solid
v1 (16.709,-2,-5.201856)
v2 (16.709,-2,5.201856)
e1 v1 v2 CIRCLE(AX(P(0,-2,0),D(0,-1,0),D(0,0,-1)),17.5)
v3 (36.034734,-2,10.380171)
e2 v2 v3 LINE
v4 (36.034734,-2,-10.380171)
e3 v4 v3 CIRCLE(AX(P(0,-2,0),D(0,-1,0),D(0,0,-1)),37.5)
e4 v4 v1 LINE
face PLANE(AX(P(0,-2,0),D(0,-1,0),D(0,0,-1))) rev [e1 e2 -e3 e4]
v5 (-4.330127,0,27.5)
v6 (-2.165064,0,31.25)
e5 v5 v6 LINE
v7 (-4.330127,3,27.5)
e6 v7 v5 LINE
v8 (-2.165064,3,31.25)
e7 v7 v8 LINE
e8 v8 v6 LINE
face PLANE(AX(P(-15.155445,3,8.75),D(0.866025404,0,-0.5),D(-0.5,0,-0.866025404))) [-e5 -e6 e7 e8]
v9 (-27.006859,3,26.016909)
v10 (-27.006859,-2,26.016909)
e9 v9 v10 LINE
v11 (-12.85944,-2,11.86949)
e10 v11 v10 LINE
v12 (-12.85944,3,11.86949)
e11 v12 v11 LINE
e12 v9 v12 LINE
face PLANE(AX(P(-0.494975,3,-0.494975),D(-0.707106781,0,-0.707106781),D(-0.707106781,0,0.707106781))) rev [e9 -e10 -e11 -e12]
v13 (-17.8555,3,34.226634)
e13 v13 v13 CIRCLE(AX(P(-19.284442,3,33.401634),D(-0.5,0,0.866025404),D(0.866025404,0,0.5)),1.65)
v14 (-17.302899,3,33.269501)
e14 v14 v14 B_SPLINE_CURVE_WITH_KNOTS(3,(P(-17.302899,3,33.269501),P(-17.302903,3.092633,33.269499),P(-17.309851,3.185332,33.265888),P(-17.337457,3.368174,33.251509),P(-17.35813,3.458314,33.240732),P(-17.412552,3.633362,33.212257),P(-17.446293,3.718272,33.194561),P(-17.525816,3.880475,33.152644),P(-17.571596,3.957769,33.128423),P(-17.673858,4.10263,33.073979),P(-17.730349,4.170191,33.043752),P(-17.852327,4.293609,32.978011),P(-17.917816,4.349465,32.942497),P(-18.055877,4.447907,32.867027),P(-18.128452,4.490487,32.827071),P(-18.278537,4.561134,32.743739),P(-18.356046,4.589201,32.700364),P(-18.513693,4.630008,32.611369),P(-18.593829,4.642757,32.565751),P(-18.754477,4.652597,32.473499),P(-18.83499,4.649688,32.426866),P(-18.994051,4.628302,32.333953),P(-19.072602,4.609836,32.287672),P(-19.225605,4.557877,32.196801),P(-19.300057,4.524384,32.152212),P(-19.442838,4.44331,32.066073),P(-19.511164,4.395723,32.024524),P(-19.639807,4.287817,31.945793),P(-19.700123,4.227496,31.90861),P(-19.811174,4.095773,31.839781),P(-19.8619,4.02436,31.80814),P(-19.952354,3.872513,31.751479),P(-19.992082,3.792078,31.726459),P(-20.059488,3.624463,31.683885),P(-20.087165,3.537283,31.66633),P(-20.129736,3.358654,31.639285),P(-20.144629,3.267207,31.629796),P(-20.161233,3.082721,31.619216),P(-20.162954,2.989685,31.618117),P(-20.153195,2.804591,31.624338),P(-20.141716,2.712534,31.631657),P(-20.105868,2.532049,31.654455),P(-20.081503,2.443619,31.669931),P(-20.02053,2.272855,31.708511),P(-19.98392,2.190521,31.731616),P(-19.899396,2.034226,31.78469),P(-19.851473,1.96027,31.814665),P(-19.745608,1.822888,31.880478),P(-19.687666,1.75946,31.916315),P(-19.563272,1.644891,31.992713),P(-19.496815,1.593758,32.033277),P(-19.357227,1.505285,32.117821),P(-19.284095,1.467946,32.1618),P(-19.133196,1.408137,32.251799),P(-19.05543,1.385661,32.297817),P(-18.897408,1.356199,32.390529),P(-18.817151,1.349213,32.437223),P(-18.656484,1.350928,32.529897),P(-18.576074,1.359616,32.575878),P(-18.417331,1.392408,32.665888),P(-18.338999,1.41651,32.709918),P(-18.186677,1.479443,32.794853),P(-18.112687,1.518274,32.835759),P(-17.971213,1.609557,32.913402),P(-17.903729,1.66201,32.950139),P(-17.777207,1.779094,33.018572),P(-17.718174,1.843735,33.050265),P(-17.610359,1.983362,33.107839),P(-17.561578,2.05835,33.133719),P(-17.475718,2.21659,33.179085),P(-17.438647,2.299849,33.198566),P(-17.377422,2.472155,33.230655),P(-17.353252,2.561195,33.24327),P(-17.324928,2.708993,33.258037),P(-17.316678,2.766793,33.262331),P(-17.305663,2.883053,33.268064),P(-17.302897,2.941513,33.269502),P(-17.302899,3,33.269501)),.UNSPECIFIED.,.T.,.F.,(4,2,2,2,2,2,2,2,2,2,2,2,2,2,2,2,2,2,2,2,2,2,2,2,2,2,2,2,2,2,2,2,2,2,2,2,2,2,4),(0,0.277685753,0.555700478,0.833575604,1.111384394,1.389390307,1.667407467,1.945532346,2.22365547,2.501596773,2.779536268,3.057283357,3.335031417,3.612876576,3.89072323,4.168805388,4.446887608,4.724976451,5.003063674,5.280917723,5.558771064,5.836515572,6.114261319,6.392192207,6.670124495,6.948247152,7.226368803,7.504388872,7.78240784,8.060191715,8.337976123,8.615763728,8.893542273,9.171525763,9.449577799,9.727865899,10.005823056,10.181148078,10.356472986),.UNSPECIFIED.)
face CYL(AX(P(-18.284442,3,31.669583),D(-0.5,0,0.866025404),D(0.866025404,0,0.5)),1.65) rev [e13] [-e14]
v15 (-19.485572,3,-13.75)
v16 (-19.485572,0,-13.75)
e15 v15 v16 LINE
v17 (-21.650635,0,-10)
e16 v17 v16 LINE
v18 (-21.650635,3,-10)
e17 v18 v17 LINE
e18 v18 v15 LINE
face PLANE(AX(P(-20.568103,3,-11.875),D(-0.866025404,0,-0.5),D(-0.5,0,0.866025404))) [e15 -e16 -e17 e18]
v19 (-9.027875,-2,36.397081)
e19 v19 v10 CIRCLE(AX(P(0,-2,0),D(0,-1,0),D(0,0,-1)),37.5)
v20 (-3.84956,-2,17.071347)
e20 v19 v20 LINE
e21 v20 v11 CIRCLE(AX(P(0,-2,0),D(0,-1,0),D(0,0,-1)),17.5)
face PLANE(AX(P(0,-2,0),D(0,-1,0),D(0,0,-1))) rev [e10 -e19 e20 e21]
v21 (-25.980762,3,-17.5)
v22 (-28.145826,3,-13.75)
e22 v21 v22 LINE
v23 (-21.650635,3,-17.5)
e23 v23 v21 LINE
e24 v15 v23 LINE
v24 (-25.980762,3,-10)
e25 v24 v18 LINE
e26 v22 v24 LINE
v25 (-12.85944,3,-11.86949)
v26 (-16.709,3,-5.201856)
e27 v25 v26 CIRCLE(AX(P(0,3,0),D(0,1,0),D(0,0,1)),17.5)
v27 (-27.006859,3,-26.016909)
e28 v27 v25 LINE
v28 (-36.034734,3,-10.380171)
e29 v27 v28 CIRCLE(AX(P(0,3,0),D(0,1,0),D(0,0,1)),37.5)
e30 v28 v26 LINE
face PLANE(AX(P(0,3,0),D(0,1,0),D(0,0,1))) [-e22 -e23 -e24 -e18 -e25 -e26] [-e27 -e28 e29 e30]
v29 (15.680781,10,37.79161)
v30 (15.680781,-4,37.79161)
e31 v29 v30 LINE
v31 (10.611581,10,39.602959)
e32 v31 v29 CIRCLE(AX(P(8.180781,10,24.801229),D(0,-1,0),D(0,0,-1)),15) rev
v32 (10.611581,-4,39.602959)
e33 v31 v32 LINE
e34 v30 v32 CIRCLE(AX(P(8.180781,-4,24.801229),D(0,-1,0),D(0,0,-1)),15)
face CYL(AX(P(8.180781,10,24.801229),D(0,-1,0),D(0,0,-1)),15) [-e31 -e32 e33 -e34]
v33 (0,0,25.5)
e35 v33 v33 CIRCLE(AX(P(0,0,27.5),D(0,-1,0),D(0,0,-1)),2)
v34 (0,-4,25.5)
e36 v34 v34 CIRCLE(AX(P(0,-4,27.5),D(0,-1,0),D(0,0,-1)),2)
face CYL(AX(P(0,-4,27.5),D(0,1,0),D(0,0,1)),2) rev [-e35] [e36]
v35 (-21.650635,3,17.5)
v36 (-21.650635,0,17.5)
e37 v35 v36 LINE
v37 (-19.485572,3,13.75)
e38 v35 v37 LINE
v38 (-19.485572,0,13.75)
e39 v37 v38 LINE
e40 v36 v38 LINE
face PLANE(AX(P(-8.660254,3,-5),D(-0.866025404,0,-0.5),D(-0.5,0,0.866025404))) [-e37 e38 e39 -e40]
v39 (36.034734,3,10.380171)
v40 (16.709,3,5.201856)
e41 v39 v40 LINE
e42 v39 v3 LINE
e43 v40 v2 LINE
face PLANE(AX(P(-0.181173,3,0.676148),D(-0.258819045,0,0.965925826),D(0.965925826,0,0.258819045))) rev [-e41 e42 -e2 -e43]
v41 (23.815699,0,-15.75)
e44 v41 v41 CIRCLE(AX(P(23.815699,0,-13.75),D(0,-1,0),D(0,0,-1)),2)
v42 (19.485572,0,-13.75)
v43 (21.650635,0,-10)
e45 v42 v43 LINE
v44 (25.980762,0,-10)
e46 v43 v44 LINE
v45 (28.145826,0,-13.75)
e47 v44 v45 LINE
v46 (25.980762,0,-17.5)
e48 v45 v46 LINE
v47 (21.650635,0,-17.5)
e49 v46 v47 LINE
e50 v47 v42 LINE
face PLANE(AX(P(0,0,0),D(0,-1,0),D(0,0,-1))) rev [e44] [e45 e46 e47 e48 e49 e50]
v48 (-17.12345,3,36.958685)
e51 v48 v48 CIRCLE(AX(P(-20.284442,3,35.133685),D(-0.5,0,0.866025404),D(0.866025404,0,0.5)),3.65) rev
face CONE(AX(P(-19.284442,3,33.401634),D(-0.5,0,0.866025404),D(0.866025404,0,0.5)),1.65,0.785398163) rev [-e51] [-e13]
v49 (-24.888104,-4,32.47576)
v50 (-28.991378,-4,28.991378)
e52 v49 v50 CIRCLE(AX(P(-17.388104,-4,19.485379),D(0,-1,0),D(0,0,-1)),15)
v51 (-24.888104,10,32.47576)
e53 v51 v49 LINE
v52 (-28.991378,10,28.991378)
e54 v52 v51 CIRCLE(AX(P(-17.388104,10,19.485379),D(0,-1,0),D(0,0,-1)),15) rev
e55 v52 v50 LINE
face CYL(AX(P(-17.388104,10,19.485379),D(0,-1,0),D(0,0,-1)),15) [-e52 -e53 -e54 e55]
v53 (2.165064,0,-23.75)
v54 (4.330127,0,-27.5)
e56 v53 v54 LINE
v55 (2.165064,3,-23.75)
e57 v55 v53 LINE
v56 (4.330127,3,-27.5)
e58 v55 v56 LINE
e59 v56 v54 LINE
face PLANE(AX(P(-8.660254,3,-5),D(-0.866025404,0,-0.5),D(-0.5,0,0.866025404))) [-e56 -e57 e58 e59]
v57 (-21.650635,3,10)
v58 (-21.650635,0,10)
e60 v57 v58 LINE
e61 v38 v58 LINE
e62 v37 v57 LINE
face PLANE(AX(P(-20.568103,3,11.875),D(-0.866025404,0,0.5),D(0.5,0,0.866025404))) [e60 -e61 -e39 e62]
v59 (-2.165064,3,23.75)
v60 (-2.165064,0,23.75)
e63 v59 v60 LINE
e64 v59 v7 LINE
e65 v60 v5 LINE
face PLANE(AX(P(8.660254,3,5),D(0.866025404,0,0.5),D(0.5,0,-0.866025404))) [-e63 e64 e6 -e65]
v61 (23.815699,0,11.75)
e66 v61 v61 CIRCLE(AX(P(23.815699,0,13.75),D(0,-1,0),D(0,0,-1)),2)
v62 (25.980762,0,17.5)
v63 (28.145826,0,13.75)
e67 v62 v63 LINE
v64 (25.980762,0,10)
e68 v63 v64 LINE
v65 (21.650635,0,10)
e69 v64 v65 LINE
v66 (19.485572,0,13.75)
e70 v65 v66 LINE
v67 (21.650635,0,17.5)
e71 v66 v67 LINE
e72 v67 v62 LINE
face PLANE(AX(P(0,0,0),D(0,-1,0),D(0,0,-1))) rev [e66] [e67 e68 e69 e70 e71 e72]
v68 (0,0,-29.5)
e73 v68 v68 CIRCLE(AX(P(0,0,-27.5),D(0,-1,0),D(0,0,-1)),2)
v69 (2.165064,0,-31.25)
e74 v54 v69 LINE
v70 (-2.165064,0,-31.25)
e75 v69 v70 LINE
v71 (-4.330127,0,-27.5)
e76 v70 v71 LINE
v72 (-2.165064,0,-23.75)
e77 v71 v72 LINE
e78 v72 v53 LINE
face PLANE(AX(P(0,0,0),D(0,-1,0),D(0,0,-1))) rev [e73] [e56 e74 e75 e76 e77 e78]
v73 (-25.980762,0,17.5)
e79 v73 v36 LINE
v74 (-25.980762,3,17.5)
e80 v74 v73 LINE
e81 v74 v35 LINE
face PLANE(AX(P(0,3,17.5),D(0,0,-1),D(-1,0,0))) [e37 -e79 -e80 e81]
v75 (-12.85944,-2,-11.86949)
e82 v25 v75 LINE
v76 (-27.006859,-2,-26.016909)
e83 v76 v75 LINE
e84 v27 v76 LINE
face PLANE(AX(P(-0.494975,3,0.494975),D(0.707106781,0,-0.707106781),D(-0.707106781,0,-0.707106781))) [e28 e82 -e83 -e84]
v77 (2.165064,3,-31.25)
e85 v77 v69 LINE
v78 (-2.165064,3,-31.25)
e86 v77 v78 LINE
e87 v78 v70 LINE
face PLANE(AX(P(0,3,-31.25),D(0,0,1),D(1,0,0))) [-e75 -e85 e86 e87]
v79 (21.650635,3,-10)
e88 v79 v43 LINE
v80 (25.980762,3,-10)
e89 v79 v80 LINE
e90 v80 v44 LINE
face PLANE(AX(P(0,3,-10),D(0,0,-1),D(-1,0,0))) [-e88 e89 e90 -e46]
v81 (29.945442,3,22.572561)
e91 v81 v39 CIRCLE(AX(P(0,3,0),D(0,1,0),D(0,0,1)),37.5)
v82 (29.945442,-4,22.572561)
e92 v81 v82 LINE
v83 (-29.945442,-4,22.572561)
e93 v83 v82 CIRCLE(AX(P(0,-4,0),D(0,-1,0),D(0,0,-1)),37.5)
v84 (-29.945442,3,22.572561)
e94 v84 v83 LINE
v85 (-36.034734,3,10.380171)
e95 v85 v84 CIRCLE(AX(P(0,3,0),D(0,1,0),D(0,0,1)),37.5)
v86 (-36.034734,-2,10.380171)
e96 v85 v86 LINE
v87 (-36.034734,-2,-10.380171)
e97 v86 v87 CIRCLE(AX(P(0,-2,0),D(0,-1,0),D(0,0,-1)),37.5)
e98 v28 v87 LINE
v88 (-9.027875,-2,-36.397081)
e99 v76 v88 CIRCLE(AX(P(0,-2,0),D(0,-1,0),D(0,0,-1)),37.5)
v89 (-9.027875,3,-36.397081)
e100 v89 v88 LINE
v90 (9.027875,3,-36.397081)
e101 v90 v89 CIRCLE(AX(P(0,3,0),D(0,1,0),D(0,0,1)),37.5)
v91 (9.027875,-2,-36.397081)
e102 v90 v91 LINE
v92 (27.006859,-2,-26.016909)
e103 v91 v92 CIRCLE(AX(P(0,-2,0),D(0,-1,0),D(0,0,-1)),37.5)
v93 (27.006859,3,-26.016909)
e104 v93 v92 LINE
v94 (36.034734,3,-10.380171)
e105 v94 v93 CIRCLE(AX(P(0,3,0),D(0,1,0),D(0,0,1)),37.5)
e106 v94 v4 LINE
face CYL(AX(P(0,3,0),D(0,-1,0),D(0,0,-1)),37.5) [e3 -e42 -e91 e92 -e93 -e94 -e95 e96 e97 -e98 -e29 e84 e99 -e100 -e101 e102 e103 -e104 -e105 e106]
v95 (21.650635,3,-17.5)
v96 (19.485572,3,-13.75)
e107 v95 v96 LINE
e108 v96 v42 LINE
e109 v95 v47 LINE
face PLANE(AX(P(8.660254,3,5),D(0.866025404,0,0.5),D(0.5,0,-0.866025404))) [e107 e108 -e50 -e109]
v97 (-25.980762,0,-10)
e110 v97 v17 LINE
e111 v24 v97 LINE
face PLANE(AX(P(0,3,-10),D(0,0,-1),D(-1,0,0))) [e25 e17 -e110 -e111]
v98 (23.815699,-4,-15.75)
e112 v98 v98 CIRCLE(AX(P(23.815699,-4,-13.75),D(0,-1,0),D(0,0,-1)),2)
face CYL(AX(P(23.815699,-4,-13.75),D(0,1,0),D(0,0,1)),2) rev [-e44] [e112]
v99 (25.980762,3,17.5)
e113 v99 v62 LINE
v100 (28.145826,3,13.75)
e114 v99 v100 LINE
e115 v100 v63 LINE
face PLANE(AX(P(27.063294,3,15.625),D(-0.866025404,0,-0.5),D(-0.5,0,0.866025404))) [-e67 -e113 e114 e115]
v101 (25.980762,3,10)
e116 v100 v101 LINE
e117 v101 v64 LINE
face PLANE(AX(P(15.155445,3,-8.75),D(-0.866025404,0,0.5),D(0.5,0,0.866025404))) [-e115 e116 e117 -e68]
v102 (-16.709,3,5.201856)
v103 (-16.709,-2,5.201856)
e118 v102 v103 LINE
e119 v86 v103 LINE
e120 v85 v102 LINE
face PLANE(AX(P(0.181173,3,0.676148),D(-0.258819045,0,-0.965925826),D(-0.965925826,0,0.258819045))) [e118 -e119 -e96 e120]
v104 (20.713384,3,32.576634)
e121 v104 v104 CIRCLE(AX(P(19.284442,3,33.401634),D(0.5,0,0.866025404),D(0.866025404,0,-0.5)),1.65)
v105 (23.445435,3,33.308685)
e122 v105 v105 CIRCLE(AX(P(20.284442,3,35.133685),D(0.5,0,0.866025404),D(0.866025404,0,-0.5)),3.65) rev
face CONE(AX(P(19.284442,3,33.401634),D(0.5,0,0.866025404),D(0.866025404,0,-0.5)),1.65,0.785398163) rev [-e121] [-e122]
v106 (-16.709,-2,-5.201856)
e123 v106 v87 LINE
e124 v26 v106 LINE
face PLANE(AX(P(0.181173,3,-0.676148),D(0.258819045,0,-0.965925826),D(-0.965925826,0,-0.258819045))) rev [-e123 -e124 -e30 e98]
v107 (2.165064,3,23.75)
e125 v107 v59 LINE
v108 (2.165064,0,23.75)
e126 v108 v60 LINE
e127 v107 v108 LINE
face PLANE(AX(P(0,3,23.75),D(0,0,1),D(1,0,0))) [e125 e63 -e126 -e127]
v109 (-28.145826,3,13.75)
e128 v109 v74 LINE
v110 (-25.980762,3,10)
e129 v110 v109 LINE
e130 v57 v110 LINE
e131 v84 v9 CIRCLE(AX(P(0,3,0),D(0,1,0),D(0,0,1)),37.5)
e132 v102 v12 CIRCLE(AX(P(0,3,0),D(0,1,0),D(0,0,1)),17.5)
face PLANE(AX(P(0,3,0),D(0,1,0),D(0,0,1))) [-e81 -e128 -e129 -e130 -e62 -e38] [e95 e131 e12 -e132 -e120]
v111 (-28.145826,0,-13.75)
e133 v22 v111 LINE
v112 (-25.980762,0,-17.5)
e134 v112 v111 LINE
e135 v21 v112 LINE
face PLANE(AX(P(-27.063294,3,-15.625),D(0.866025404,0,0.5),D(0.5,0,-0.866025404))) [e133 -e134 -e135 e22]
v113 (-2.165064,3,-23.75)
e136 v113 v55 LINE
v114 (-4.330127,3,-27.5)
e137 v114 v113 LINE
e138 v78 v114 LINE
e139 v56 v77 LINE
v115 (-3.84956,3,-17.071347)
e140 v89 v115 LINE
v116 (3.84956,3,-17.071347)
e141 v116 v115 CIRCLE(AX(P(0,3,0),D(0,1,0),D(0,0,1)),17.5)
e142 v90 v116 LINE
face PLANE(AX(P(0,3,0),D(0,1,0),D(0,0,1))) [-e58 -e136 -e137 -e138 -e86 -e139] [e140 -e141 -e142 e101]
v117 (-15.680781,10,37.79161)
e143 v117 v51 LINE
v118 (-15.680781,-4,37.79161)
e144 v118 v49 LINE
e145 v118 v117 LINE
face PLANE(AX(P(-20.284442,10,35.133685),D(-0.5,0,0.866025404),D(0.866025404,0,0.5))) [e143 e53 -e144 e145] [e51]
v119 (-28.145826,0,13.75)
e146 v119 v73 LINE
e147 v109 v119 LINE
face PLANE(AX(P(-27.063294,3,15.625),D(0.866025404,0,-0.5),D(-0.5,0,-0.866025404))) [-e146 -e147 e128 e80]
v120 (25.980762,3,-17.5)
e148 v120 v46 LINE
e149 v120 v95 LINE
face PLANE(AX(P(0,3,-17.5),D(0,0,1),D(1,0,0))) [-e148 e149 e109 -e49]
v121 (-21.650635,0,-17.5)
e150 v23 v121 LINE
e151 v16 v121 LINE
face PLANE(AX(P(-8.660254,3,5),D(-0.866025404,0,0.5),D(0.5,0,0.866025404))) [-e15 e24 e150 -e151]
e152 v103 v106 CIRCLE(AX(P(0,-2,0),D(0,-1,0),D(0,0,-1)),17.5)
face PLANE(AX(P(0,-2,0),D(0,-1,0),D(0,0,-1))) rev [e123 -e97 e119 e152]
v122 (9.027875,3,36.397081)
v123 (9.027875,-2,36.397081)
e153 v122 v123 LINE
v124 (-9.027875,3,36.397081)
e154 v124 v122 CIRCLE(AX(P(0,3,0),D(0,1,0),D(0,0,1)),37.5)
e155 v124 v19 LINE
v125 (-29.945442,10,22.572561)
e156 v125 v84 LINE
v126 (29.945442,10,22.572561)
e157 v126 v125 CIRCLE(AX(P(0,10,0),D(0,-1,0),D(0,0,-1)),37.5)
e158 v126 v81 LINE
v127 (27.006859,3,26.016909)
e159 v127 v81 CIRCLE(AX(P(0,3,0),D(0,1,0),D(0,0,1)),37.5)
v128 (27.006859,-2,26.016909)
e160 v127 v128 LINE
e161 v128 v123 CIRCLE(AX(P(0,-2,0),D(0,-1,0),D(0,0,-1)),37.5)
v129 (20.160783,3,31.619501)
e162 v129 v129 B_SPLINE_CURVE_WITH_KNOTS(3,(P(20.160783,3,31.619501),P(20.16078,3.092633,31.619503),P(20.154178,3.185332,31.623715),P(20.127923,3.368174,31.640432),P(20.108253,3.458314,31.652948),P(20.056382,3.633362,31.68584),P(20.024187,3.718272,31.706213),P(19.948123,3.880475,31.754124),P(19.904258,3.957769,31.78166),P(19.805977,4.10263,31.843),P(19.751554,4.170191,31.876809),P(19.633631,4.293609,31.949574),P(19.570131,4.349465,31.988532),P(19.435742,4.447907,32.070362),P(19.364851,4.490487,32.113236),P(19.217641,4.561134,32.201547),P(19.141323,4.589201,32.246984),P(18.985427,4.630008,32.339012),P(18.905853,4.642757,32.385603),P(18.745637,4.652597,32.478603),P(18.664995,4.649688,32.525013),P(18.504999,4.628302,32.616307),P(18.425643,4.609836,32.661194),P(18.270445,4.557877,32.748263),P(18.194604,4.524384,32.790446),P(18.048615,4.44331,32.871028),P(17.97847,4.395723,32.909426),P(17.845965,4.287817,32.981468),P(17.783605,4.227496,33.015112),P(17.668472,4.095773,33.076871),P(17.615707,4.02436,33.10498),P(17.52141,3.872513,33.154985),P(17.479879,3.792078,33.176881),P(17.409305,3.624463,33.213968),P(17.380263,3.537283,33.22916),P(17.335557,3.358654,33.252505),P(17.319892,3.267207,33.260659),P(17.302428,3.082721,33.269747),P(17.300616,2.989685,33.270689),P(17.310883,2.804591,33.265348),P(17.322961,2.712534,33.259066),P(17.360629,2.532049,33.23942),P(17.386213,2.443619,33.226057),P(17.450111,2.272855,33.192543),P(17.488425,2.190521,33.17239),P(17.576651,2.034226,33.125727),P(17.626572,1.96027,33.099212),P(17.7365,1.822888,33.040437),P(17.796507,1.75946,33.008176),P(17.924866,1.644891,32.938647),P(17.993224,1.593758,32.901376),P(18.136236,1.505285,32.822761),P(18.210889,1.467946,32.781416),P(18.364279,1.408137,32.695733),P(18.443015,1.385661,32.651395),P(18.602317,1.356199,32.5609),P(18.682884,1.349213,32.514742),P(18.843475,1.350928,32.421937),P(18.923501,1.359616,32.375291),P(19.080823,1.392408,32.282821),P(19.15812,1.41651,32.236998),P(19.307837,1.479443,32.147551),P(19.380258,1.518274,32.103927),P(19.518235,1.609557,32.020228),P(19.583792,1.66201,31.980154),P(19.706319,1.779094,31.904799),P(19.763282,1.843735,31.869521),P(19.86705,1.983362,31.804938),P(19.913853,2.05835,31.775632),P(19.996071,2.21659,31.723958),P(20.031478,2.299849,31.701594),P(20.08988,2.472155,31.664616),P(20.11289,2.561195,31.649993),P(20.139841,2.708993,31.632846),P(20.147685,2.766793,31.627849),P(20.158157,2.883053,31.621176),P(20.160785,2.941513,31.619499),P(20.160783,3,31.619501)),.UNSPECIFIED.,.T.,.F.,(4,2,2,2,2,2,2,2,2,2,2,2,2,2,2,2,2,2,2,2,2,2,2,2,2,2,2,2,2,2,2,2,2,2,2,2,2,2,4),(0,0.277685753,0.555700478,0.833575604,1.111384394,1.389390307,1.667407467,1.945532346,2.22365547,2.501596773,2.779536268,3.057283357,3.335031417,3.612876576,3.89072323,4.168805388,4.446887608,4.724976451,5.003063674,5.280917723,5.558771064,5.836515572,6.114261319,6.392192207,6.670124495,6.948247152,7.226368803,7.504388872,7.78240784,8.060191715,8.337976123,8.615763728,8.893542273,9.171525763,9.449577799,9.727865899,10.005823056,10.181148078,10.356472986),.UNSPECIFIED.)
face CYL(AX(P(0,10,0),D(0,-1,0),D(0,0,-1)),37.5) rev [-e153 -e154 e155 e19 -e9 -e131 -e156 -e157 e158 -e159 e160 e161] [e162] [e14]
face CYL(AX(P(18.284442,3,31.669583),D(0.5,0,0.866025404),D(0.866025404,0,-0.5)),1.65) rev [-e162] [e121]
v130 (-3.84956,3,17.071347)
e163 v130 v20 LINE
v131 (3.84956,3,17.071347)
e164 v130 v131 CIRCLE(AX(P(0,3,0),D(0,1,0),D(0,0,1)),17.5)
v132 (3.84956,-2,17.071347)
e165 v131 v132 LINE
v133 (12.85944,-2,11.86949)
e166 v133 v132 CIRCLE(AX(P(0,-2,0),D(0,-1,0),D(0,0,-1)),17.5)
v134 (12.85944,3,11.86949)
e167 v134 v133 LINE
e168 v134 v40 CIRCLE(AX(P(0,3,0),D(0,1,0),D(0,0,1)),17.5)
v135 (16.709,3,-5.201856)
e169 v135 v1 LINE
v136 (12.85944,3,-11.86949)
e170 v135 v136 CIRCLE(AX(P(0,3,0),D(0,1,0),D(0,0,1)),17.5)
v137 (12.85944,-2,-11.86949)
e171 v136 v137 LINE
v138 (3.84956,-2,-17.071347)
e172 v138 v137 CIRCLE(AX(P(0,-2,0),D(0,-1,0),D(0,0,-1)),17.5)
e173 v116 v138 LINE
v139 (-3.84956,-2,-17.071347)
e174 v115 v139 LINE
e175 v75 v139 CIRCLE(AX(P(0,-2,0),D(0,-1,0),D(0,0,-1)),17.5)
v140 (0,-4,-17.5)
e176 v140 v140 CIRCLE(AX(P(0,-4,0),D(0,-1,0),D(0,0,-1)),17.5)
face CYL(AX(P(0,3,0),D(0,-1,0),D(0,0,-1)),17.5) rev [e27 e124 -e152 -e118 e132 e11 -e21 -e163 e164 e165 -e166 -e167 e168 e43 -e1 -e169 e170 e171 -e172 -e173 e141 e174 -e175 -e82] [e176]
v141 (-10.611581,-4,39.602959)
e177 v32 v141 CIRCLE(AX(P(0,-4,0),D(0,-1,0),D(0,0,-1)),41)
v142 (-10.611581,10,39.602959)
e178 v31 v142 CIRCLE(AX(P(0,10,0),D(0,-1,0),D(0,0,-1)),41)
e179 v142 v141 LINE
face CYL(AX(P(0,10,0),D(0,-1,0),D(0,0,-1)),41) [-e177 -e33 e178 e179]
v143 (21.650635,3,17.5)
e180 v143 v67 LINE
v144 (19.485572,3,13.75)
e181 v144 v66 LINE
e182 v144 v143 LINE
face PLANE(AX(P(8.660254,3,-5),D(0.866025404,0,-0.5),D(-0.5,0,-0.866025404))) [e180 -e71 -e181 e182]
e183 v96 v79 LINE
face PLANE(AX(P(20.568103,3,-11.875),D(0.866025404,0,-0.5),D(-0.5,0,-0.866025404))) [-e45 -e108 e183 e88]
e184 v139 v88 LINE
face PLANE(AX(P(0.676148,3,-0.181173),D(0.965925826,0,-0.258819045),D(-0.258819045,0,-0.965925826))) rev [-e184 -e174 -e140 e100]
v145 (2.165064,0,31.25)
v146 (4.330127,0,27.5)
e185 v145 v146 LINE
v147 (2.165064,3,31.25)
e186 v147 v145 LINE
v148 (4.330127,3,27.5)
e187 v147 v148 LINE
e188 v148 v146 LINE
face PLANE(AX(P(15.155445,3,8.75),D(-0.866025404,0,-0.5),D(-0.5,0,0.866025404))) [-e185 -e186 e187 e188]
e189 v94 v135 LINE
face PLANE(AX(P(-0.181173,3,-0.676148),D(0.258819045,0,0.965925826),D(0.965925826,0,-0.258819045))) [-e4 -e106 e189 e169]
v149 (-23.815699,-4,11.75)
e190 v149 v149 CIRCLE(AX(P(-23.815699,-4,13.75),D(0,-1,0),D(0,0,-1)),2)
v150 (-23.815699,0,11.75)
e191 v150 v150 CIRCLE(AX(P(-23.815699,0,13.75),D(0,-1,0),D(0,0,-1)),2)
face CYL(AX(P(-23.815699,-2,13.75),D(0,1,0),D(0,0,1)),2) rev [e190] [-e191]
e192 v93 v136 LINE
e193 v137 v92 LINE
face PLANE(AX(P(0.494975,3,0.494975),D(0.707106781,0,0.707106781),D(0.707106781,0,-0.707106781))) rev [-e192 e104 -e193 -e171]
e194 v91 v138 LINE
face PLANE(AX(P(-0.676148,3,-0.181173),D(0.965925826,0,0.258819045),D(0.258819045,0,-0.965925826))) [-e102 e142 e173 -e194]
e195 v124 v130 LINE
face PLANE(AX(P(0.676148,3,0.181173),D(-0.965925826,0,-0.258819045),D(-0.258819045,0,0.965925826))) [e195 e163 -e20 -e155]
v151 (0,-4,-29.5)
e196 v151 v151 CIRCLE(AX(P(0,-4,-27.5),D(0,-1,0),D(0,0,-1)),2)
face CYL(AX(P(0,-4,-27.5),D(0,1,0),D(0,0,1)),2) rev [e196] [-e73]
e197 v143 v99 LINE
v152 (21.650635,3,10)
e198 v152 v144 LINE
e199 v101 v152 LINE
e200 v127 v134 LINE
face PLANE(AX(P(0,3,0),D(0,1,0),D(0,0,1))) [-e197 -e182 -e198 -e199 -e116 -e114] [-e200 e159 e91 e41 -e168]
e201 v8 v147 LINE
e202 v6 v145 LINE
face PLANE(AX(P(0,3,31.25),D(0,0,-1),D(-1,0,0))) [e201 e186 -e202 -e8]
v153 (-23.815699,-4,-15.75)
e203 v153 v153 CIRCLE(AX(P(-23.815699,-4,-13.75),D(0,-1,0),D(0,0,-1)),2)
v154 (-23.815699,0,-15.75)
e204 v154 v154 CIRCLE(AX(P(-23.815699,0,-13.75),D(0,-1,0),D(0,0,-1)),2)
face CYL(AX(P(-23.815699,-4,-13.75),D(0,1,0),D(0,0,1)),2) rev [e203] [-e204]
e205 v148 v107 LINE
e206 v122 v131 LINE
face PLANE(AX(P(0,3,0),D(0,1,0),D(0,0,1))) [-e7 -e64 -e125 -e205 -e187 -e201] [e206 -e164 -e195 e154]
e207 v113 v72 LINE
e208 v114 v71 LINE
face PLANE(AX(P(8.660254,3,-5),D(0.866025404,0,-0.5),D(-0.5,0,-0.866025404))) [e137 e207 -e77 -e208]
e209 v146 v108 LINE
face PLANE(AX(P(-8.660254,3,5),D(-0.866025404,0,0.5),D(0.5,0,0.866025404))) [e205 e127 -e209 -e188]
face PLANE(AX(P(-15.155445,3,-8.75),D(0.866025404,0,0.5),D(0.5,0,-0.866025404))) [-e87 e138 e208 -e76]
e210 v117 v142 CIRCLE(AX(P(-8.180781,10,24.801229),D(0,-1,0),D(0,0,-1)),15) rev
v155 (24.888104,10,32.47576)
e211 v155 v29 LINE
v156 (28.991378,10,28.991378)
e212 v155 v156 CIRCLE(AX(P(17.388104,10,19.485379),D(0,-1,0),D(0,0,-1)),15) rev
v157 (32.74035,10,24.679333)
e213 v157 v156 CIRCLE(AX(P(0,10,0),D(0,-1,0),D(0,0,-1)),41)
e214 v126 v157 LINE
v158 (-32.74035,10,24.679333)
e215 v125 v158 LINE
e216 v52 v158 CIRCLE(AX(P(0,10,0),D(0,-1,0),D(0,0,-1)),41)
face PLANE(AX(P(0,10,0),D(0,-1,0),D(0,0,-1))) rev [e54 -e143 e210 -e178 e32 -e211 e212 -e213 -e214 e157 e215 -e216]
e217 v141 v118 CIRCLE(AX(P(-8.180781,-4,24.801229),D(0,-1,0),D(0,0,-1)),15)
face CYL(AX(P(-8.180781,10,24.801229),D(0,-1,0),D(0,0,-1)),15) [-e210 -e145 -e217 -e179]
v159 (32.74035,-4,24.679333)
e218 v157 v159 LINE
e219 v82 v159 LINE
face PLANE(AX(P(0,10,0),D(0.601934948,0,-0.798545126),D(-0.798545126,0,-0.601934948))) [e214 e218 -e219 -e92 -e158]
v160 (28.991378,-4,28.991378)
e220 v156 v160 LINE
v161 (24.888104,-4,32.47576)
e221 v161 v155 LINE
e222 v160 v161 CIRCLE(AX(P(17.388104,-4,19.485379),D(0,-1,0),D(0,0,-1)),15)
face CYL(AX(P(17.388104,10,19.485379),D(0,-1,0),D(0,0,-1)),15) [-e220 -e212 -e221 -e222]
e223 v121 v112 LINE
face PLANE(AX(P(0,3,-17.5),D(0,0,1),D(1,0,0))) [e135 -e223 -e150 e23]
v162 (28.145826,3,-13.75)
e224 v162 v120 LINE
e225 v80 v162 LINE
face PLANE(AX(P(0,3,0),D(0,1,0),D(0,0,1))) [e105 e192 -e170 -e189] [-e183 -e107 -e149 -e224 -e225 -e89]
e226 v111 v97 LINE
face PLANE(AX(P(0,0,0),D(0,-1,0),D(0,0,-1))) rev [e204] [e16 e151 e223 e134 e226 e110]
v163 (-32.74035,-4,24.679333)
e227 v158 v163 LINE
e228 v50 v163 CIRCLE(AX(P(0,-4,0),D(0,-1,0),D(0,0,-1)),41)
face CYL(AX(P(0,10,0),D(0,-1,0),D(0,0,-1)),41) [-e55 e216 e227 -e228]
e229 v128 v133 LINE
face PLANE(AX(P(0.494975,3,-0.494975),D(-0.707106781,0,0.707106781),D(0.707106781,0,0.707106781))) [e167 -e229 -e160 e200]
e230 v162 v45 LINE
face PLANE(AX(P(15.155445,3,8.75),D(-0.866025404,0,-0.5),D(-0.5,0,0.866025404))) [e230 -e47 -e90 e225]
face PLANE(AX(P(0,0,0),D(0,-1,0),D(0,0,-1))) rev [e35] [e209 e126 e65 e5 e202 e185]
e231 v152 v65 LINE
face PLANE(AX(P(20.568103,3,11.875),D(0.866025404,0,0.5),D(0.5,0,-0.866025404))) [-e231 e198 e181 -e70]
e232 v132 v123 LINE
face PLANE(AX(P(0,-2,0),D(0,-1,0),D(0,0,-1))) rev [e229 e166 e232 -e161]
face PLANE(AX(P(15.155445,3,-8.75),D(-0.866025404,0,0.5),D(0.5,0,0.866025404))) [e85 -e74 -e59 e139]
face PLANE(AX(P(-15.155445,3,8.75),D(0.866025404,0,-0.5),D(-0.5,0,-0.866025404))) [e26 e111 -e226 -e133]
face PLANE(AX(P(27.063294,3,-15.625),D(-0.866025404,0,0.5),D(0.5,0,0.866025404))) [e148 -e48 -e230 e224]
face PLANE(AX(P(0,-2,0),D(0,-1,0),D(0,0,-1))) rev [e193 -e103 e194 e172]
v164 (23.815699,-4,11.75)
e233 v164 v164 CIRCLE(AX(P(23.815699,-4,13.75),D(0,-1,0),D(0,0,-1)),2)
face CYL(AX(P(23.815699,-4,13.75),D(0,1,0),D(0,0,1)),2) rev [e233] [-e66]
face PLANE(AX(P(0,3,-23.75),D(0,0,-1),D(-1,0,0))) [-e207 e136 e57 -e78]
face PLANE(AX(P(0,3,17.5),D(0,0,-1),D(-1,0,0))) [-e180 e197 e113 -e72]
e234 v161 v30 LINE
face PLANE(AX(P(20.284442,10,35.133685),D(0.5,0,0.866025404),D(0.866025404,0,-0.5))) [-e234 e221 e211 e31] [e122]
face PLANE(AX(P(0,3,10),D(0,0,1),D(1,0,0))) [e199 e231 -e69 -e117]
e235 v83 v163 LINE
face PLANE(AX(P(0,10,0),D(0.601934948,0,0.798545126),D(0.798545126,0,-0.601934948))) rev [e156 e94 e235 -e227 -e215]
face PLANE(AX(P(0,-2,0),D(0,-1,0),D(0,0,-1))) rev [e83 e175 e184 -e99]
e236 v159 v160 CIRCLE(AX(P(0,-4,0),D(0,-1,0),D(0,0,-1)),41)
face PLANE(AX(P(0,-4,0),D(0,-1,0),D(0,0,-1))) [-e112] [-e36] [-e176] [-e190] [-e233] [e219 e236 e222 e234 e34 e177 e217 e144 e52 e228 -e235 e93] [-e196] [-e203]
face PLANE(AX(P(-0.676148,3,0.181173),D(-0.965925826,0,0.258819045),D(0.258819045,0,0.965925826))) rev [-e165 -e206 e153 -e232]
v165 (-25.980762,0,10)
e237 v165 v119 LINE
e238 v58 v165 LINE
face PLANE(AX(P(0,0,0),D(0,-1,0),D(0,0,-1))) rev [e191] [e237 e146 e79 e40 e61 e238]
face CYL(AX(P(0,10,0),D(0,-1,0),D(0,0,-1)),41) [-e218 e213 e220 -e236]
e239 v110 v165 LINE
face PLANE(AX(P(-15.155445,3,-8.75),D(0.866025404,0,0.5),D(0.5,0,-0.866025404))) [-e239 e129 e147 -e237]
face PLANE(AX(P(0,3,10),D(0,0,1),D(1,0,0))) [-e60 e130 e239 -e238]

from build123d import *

# Parameters (mm, degrees)
BOSS_EXTRUDE2_DEPTH = 3
BOSS_EXTRUDE3_START = 2
SKETCH2_R           = 2
BOSS_EXTRUDE3_DEPTH = 2
BOSS_EXTRUDE4_START = 2
SKETCH3_R           = 37.5
SKETCH3_R_2         = 17.5
SKETCH3_R_3         = 2
BOSS_EXTRUDE4_DEPTH = 2
BOSS_EXTRUDE5_DEPTH = 14
FILLET1_R           = 15
CUT_EXTRUDE1_DEPTH  = 4
CUT_EXTRUDE2_DEPTH  = 4
CHAMFER2_SIZE       = 2


with BuildPart() as part:
    # Sketch1 → Boss-Extrude2 (new body)
    # profile 1 of 9: a face of its own
    with BuildSketch(Plane(origin=(0, 0, 0), x_dir=(1, 0, 0), z_dir=(0, 1, 0))):
        with BuildLine():
            ThreePointArc((-3.849560294, 17.071346917), (-1.936676142, 17.392506591), (0, 17.5))
            Line((0, 17.5), (0, 23.75))
            Line((0, 23.75), (-2.165063509, 23.75))
            Line((-2.165063509, 23.75), (-4.330127019, 27.5))
            Line((-4.330127019, 27.5), (-2.165063509, 31.25))
            Line((-2.165063509, 31.25), (0, 31.25))
            Line((0, 31.25), (0, 37.5))
            ThreePointArc((0, 37.5), (-4.547498174, 37.223248923), (-9.027875015, 36.397080552))
            Line((-9.027875015, 36.397080552), (-3.849560294, 17.071346917))
        make_face()
    # profile 2 of 9: a face of its own
    with BuildSketch(Plane(origin=(0, 0, 0), x_dir=(1, 0, 0), z_dir=(0, 1, 0))):
        with BuildLine():
            Line((3.849560294, 17.071346917), (9.027875015, 36.397080552))
            ThreePointArc((9.027875015, 36.397080552), (4.547498174, 37.223248923), (0, 37.5))
            Line((0, 37.5), (0, 31.25))
            Line((0, 31.25), (2.165063509, 31.25))
            Line((2.165063509, 31.25), (4.330127019, 27.5))
            Line((4.330127019, 27.5), (2.165063509, 23.75))
            Line((2.165063509, 23.75), (0, 23.75))
            Line((0, 23.75), (0, 17.5))
            ThreePointArc((0, 17.5), (1.936676142, 17.392506591), (3.849560294, 17.071346917))
        make_face()
    # profile 3 of 9: a face of its own
    with BuildSketch(Plane(origin=(0, 0, 0), x_dir=(1, 0, 0), z_dir=(0, 1, 0))):
        with BuildLine():
            Line((-36.034733889, 10.380171171), (-16.709000253, 5.201856451))
            ThreePointArc((-16.709000253, 5.201856451), (-15.155444566, 8.75), (-12.85943996, 11.869490466))
            Line((-12.85943996, 11.869490466), (-27.006858875, 26.016909381))
            ThreePointArc((-27.006858875, 26.016909381), (-32.475952642, 18.75), (-36.034733889, 10.380171171))
        make_face()
        Polygon((-21.650635095, 10), (-25.980762114, 10), (-28.145825623, 13.75), (-25.980762114, 17.5), (-21.650635095, 17.5), (-19.485571585, 13.75), align=None, mode=Mode.SUBTRACT)
    # profile 4 of 9: a face of its own
    with BuildSketch(Plane(origin=(0, 0, 0), x_dir=(1, 0, 0), z_dir=(0, 1, 0))):
        with BuildLine():
            Line((19.485571585, 13.75), (21.650635095, 17.5))
            Line((21.650635095, 17.5), (24.609026292, 17.5))
            Line((24.609026292, 17.5), (26.250883265, 25.260933771))
            Line((26.250883265, 25.260933771), (12.85943996, 11.869490466))
            ThreePointArc((12.85943996, 11.869490466), (14.094014472, 10.373464034), (15.155444566, 8.75))
            Line((15.155444566, 8.75), (20.56810334, 11.875))
            Line((20.56810334, 11.875), (19.485571585, 13.75))
        make_face()
    # profile 5 of 9: a face of its own
    with BuildSketch(Plane(origin=(0, 0, 0), x_dir=(1, 0, 0), z_dir=(0, 1, 0))):
        with BuildLine():
            Line((21.650635095, 10), (20.56810334, 11.875))
            Line((20.56810334, 11.875), (15.155444566, 8.75))
            ThreePointArc((15.155444566, 8.75), (16.030690615, 7.019042557), (16.709000253, 5.201856451))
            Line((16.709000253, 5.201856451), (36.034733889, 10.380171171))
            ThreePointArc((36.034733889, 10.380171171), (34.510028266, 14.673375519), (32.475952642, 18.75))
            Line((32.475952642, 18.75), (27.063293868, 15.625))
            Line((27.063293868, 15.625), (28.145825623, 13.75))
            Line((28.145825623, 13.75), (25.980762114, 10))
            Line((25.980762114, 10), (21.650635095, 10))
        make_face()
    # profile 6 of 9: a face of its own
    with BuildSketch(Plane(origin=(0, 0, 0), x_dir=(1, 0, 0), z_dir=(0, 1, 0))):
        with BuildLine():
            Line((26.250883265, 25.260933771), (24.609026292, 17.5))
            Line((24.609026292, 17.5), (25.980762114, 17.5))
            Line((25.980762114, 17.5), (27.063293868, 15.625))
            Line((27.063293868, 15.625), (32.475952642, 18.75))
            ThreePointArc((32.475952642, 18.75), (29.962530091, 22.549873404), (27.006858875, 26.016909381))
            Line((27.006858875, 26.016909381), (26.250883265, 25.260933771))
        make_face()
    # profile 7 of 9: a face of its own
    with BuildSketch(Plane(origin=(0, 0, 0), x_dir=(1, 0, 0), z_dir=(0, 1, 0))):
        with BuildLine():
            Line((36.034733889, -10.380171171), (16.709000253, -5.201856451))
            ThreePointArc((16.709000253, -5.201856451), (15.155444566, -8.75), (12.85943996, -11.869490466))
            Line((12.85943996, -11.869490466), (27.006858875, -26.016909381))
            ThreePointArc((27.006858875, -26.016909381), (32.475952642, -18.75), (36.034733889, -10.380171171))
        make_face()
        Polygon((21.650635095, -10), (25.980762114, -10), (28.145825623, -13.75), (25.980762114, -17.5), (21.650635095, -17.5), (19.485571585, -13.75), align=None, mode=Mode.SUBTRACT)
    # profile 8 of 9: a face of its own
    with BuildSketch(Plane(origin=(0, 0, 0), x_dir=(1, 0, 0), z_dir=(0, 1, 0))):
        with BuildLine():
            Line((9.027875015, -36.397080552), (3.849560294, -17.071346917))
            ThreePointArc((3.849560294, -17.071346917), (0, -17.5), (-3.849560294, -17.071346917))
            Line((-3.849560294, -17.071346917), (-9.027875015, -36.397080552))
            ThreePointArc((-9.027875015, -36.397080552), (0, -37.5), (9.027875015, -36.397080552))
        make_face()
        Polygon((2.165063509, -23.75), (4.330127019, -27.5), (2.165063509, -31.25), (-2.165063509, -31.25), (-4.330127019, -27.5), (-2.165063509, -23.75), align=None, mode=Mode.SUBTRACT)
    # profile 9 of 9: a face of its own
    with BuildSketch(Plane(origin=(0, 0, 0), x_dir=(1, 0, 0), z_dir=(0, 1, 0))):
        with BuildLine():
            Line((-27.006858875, -26.016909381), (-12.85943996, -11.869490466))
            ThreePointArc((-12.85943996, -11.869490466), (-15.155444566, -8.75), (-16.709000253, -5.201856451))
            Line((-16.709000253, -5.201856451), (-36.034733889, -10.380171171))
            ThreePointArc((-36.034733889, -10.380171171), (-32.475952642, -18.75), (-27.006858875, -26.016909381))
        make_face()
        Polygon((-19.485571585, -13.75), (-21.650635095, -17.5), (-25.980762114, -17.5), (-28.145825623, -13.75), (-25.980762114, -10), (-21.650635095, -10), align=None, mode=Mode.SUBTRACT)
    extrude(amount=BOSS_EXTRUDE2_DEPTH)

    # Sketch2 → Boss-Extrude3 (add)
    # profile 1 of 6: a face of its own
    with BuildSketch(Plane(origin=(0, 0, 0), x_dir=(-1, 0, 0), z_dir=(0, -1, 0)).offset(BOSS_EXTRUDE3_START)):
        with BuildLine():
            ThreePointArc((12.85943996, 11.869490466), (15.155444566, 8.75), (16.709000253, 5.201856451))
            Line((16.709000253, 5.201856451), (36.034733889, 10.380171171))
            ThreePointArc((36.034733889, 10.380171171), (32.475952642, 18.75), (27.006858875, 26.016909381))
            Line((27.006858875, 26.016909381), (12.85943996, 11.869490466))
        make_face()
        with Locations(Location((23.815698604, 13.75, 0), (0, 0, 90))):
            Circle(SKETCH2_R, mode=Mode.SUBTRACT)
    # profile 2 of 6: a face of its own
    with BuildSketch(Plane(origin=(0, 0, 0), x_dir=(-1, 0, 0), z_dir=(0, -1, 0)).offset(BOSS_EXTRUDE3_START)):
        with BuildLine():
            Line((36.034733889, -10.380171171), (16.709000253, -5.201856451))
            ThreePointArc((16.709000253, -5.201856451), (15.155444566, -8.75), (12.85943996, -11.869490466))
            Line((12.85943996, -11.869490466), (27.006858875, -26.016909381))
            ThreePointArc((27.006858875, -26.016909381), (32.475952642, -18.75), (36.034733889, -10.380171171))
        make_face()
        with Locations(Location((23.815698604, -13.75, 0), (0, 0, 90))):
            Circle(SKETCH2_R, mode=Mode.SUBTRACT)
    # profile 3 of 6: a face of its own
    with BuildSketch(Plane(origin=(0, 0, 0), x_dir=(-1, 0, 0), z_dir=(0, -1, 0)).offset(BOSS_EXTRUDE3_START)):
        with BuildLine():
            ThreePointArc((-3.849560294, 17.071346917), (0, 17.5), (3.849560294, 17.071346917))
            Line((3.849560294, 17.071346917), (9.027875015, 36.397080552))
            ThreePointArc((9.027875015, 36.397080552), (0, 37.5), (-9.027875015, 36.397080552))
            Line((-9.027875015, 36.397080552), (-3.849560294, 17.071346917))
        make_face()
        with Locations(Location((0, 27.5, 0), (0, 0, 90))):
            Circle(SKETCH2_R, mode=Mode.SUBTRACT)
    # profile 4 of 6: a face of its own
    with BuildSketch(Plane(origin=(0, 0, 0), x_dir=(-1, 0, 0), z_dir=(0, -1, 0)).offset(BOSS_EXTRUDE3_START)):
        with BuildLine():
            Line((9.027875015, -36.397080552), (3.849560294, -17.071346917))
            ThreePointArc((3.849560294, -17.071346917), (0, -17.5), (-3.849560294, -17.071346917))
            Line((-3.849560294, -17.071346917), (-9.027875015, -36.397080552))
            ThreePointArc((-9.027875015, -36.397080552), (0, -37.5), (9.027875015, -36.397080552))
        make_face()
        with Locations(Location((0, -27.5, 0), (0, 0, 90))):
            Circle(SKETCH2_R, mode=Mode.SUBTRACT)
    # profile 5 of 6: a face of its own
    with BuildSketch(Plane(origin=(0, 0, 0), x_dir=(-1, 0, 0), z_dir=(0, -1, 0)).offset(BOSS_EXTRUDE3_START)):
        with BuildLine():
            ThreePointArc((-16.709000253, 5.201856451), (-15.155444566, 8.75), (-12.85943996, 11.869490466))
            Line((-12.85943996, 11.869490466), (-27.006858875, 26.016909381))
            ThreePointArc((-27.006858875, 26.016909381), (-32.475952642, 18.75), (-36.034733889, 10.380171171))
            Line((-36.034733889, 10.380171171), (-16.709000253, 5.201856451))
        make_face()
        with Locations(Location((-23.815698604, 13.75, 0), (0, 0, 90))):
            Circle(SKETCH2_R, mode=Mode.SUBTRACT)
    # profile 6 of 6: a face of its own
    with BuildSketch(Plane(origin=(0, 0, 0), x_dir=(-1, 0, 0), z_dir=(0, -1, 0)).offset(BOSS_EXTRUDE3_START)):
        with BuildLine():
            Line((-27.006858875, -26.016909381), (-12.85943996, -11.869490466))
            ThreePointArc((-12.85943996, -11.869490466), (-15.155444566, -8.75), (-16.709000253, -5.201856451))
            Line((-16.709000253, -5.201856451), (-36.034733889, -10.380171171))
            ThreePointArc((-36.034733889, -10.380171171), (-32.475952642, -18.75), (-27.006858875, -26.016909381))
        make_face()
        with Locations(Location((-23.815698604, -13.75, 0), (0, 0, 90))):
            Circle(SKETCH2_R, mode=Mode.SUBTRACT)
    extrude(amount=-BOSS_EXTRUDE3_DEPTH)

    # Sketch3 → Boss-Extrude4 (add)
    with BuildSketch(Plane(origin=(0, -2, 0), x_dir=(-1, 0, 0), z_dir=(0, -1, 0)).offset(BOSS_EXTRUDE4_START)):
        with Locations(Location((0, 0, 0), (0, 0, 90))):
            Circle(SKETCH3_R)
        with Locations(Location((0, 0, 0), (0, 0, 90))):
            Circle(SKETCH3_R_2, mode=Mode.SUBTRACT)
        with Locations(Location((0, 27.5, 0), (0, 0, 90))):
            Circle(SKETCH3_R_3, mode=Mode.SUBTRACT)
        with Locations(Location((23.815698604, 13.75, 0), (0, 0, 90))):
            Circle(SKETCH3_R_3, mode=Mode.SUBTRACT)
        with Locations(Location((23.815698604, -13.75, 0), (0, 0, 90))):
            Circle(SKETCH3_R_3, mode=Mode.SUBTRACT)
        with Locations(Location((0, -27.5, 0), (0, 0, 90))):
            Circle(SKETCH3_R_3, mode=Mode.SUBTRACT)
        with Locations(Location((-23.815698604, -13.75, 0), (0, 0, 90))):
            Circle(SKETCH3_R_3, mode=Mode.SUBTRACT)
        with Locations(Location((-23.815698604, 13.75, 0), (0, 0, 90))):
            Circle(SKETCH3_R_3, mode=Mode.SUBTRACT)
    extrude(amount=-BOSS_EXTRUDE4_DEPTH)

    # Sketch4 → Boss-Extrude5 (add)
    with BuildSketch(Plane(origin=(0, -4, 0), x_dir=(-1, 0, 0), z_dir=(0, -1, 0))):
        with BuildLine():
            Line((32.740350171, -24.679332865), (29.94544223, -22.572560548))
            ThreePointArc((29.94544223, -22.572560548), (0, -37.5), (-29.94544223, -22.572560548))
            Line((-29.94544223, -22.572560548), (-32.740350171, -24.679332865))
            ThreePointArc((-32.740350171, -24.679332865), (-30.941073026, -26.900743484), (-28.991378029, -28.991378029))
            Line((-28.991378029, -28.991378029), (-29.69848481, -29.69848481))
            Line((-29.69848481, -29.69848481), (-10.870399894, -40.568884704))
            Line((-10.870399894, -40.568884704), (-10.611580849, -39.602958878))
            ThreePointArc((-10.611580849, -39.602958878), (0, -41), (10.611580849, -39.602958878))
            Line((10.611580849, -39.602958878), (10.870399894, -40.568884704))
            Line((10.870399894, -40.568884704), (29.69848481, -29.69848481))
            Line((29.69848481, -29.69848481), (28.991378029, -28.991378029))
            ThreePointArc((28.991378029, -28.991378029), (30.941073026, -26.900743484), (32.740350171, -24.679332865))
        make_face()
    extrude(amount=-BOSS_EXTRUDE5_DEPTH)

    # Fillet1
    # the kernel refuses this fillet: 15 mm, written as the material it takes off along each edge
    with BuildSketch(Plane(origin=(29.69848481, -17.886373995, 29.69848481), x_dir=(-0.707106781186544, 0, -0.7071067811865511), z_dir=(0, 1, 0)), Plane(origin=(-10.870399894, -17.886373995, 40.568884704), x_dir=(0.25881904510252357, 0, -0.9659258262890675), z_dir=(0, 1, 0))) as fillet1_piece_1:
        with BuildLine():
            CenterArc((15.926510617, 1.482997233), FILLET1_R, 165, 20.67390123)
            Line((1.437623223, 5.36528291), (0, 0))
            Line((0, 0), (1, 0))
        make_face()
    extrude(amount=41.772747989, mode=Mode.SUBTRACT)
    with BuildSketch(Plane(origin=(10.870399894, -17.886373995, 40.568884704), x_dir=(0.8660254037843682, 0, -0.500000000000122), z_dir=(0, 1, 0)), Plane(origin=(-29.69848481, -17.886373995, 29.69848481), x_dir=(0.8660254037844387, 0, 0.5000000000000001), z_dir=(0, 1, 0))) as fillet1_piece_2:
        with BuildLine():
            CenterArc((5.554549598, 15), FILLET1_R, 249.32609877, 20.67390123)
            Line((0.258819045, 0.965925826), (0, 0))
            Line((0, 0), (5.554549598, 0))
        make_face()
    extrude(amount=41.772747989, mode=Mode.SUBTRACT)

    # Sketch6 → Cut-Extrude1 (cut)
    with BuildSketch(Plane(origin=(20.284442352, 0, 35.133684757), x_dir=(0.8660254037843756, 0, -0.5000000000001092), z_dir=(0.5000000000001092, 0, 0.8660254037843756))):
        with BuildLine():
            Line((1.65, 3), (0, 3))
            Line((0, 3), (0, 1.35))
            ThreePointArc((0, 1.35), (1.166726189, 1.833273811), (1.65, 3))
        make_face()
        with BuildLine():
            Line((0, 1.35), (0, 3))
            Line((0, 3), (-1.65, 3))
            ThreePointArc((-1.65, 3), (-1.166726189, 1.833273811), (0, 1.35))
        make_face()
        with BuildLine():
            Line((0, 4.65), (0, 3))
            Line((0, 3), (1.65, 3))
            ThreePointArc((1.65, 3), (1.166726189, 4.166726189), (0, 4.65))
        make_face()
        with BuildLine():
            Line((-1.65, 3), (0, 3))
            Line((0, 3), (0, 4.65))
            ThreePointArc((0, 4.65), (-1.166726189, 4.166726189), (-1.65, 3))
        make_face()
    extrude(amount=-CUT_EXTRUDE1_DEPTH, mode=Mode.SUBTRACT)

    # Sketch7 → Cut-Extrude2 (cut)
    with BuildSketch(Plane(origin=(-20.284442352, 0, 35.133684757), x_dir=(0.8660254037845003, 0, 0.4999999999998932), z_dir=(-0.49999999999989325, 0, 0.8660254037845004))):
        with BuildLine():
            Line((1.65, 3), (0, 3))
            Line((0, 3), (0, 1.35))
            ThreePointArc((0, 1.35), (1.166726189, 1.833273811), (1.65, 3))
        make_face()
        with BuildLine():
            Line((0, 1.35), (0, 3))
            Line((0, 3), (-1.65, 3))
            ThreePointArc((-1.65, 3), (-1.166726189, 1.833273811), (0, 1.35))
        make_face()
        with BuildLine():
            Line((-1.65, 3), (0, 3))
            Line((0, 3), (0, 4.65))
            ThreePointArc((0, 4.65), (-1.166726189, 4.166726189), (-1.65, 3))
        make_face()
        with BuildLine():
            Line((0, 4.65), (0, 3))
            Line((0, 3), (1.65, 3))
            ThreePointArc((1.65, 3), (1.166726189, 4.166726189), (0, 4.65))
        make_face()
    extrude(amount=-CUT_EXTRUDE2_DEPTH, mode=Mode.SUBTRACT)

    # Chamfer2
    chamfer2_edges = [part.edges().sort_by_distance(p)[0] for p in [
        (20.284442352, 1.35, 35.133684757),
        (-21.713384268, 3, 34.308684757),
    ]]
    chamfer(chamfer2_edges, length=CHAMFER2_SIZE)


solid = part.part
